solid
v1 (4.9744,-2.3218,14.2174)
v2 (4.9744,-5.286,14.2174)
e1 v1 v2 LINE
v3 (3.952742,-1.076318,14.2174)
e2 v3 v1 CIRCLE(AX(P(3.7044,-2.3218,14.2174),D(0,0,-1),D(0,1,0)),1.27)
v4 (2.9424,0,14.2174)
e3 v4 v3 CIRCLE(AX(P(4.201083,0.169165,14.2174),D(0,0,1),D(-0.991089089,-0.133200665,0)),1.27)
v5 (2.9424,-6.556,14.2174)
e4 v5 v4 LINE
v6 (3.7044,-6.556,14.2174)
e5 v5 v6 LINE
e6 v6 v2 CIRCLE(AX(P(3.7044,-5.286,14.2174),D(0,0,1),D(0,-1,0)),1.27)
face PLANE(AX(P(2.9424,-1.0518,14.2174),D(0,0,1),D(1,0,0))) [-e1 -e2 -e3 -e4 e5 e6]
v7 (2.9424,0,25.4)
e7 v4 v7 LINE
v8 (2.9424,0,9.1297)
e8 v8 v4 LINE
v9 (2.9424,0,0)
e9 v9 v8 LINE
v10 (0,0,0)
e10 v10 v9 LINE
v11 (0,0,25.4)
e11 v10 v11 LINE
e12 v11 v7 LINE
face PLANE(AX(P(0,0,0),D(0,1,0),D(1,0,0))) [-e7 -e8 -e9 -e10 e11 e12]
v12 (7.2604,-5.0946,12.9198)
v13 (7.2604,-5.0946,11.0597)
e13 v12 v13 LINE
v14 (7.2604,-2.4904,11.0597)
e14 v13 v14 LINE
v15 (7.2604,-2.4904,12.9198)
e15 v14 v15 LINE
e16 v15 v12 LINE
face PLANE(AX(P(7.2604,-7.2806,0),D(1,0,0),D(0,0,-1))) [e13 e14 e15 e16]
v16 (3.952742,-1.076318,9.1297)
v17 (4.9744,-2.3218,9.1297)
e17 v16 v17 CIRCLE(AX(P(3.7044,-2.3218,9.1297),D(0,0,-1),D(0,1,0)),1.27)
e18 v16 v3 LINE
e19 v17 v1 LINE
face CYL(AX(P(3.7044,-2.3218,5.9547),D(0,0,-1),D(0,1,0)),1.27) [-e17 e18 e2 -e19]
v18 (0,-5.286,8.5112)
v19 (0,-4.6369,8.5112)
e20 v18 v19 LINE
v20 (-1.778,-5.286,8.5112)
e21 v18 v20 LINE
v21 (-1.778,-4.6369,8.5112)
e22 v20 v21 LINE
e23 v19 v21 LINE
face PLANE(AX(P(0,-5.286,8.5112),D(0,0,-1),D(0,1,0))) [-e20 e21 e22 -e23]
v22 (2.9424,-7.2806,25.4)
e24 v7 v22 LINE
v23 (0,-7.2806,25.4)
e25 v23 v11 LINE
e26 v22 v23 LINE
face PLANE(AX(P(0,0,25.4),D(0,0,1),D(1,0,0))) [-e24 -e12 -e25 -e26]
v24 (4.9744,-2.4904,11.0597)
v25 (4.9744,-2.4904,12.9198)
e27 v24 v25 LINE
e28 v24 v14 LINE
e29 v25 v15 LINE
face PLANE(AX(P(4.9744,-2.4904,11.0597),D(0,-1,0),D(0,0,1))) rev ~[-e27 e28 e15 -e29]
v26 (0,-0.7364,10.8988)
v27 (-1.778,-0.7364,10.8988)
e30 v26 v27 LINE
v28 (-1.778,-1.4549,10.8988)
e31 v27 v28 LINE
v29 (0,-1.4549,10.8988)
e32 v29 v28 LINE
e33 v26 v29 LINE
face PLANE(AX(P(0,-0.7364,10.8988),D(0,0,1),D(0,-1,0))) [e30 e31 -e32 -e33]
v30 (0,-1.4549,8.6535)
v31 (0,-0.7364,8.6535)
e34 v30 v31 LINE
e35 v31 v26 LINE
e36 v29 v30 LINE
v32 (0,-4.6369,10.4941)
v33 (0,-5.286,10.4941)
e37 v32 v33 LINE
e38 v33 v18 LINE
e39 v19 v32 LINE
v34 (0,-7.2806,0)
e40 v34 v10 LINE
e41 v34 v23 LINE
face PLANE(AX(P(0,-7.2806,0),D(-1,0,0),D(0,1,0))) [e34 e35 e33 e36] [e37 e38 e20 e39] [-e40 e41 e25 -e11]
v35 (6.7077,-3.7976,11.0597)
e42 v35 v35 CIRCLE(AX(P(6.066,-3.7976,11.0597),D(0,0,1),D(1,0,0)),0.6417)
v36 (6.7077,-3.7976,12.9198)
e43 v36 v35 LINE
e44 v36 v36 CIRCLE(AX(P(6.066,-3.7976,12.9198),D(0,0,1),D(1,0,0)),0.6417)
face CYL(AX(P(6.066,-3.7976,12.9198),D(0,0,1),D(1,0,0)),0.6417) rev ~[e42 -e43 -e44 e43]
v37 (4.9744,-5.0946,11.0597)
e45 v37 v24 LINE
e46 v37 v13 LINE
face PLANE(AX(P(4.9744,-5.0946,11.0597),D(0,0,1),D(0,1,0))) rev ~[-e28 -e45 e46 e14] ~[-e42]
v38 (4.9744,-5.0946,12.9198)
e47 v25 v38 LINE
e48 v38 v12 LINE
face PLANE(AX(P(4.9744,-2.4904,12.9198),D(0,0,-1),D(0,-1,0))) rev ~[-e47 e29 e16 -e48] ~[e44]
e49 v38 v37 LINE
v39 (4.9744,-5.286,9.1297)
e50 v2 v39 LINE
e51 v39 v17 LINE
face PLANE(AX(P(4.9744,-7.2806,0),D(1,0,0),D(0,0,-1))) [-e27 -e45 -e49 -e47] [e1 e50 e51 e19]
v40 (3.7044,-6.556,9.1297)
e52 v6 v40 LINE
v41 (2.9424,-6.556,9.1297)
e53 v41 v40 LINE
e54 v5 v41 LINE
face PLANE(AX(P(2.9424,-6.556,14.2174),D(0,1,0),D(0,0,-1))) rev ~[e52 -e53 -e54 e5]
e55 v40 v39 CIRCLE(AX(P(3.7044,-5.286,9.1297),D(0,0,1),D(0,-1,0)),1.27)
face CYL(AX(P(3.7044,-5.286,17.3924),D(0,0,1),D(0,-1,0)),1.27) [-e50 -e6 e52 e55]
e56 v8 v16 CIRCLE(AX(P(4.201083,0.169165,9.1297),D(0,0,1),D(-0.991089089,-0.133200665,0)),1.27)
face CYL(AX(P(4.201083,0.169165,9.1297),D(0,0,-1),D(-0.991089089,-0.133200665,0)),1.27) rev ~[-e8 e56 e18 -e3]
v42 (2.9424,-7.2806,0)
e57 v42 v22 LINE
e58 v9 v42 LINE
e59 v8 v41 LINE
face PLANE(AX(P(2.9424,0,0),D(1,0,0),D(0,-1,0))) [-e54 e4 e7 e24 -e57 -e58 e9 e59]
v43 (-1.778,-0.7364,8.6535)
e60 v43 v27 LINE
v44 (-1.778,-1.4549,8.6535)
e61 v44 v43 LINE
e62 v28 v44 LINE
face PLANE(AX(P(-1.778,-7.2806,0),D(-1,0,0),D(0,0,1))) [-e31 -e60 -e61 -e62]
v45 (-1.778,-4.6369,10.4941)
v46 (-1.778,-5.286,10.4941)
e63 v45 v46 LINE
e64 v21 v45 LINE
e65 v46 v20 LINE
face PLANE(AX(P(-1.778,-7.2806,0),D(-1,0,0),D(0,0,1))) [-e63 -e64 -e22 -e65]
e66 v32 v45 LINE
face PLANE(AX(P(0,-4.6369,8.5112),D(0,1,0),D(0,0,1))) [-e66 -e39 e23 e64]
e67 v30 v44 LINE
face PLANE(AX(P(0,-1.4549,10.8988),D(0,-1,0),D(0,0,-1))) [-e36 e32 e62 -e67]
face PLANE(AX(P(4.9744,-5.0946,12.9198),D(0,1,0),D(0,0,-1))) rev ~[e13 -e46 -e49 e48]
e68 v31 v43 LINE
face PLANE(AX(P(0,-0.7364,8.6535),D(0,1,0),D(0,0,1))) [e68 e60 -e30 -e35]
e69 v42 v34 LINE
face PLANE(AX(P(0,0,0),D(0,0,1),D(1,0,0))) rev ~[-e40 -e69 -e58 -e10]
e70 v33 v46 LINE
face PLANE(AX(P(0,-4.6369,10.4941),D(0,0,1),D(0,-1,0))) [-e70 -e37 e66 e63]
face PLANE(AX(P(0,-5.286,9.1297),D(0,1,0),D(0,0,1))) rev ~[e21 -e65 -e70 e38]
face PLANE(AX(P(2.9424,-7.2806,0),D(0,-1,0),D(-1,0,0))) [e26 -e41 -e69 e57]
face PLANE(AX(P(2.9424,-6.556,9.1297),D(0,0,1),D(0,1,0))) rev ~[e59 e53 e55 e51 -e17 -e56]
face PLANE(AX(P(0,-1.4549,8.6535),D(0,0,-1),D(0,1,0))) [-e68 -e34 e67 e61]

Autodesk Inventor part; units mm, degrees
ref_plane "YZ Plane" through (0, 0, 0) normal (1, 0, 0) x (0, 1, 0)
ref_plane "XZ Plane" through (0, 0, 0) normal (0, 1, 0) x (-1, 0, 0)
ref_plane "XY Plane" through (0, 0, 0) normal (0, 0, 1) x (1, 0, 0)
sketch "Sketch1" plane through (0, 0, 0) normal (0, 0, 1) x (1, 0, 0)
  line L0 (0, 0) -> (2.9424, 0)
  line L1 (2.9424, 0) -> (2.9424, -7.2806)
  line L2 (2.9424, -7.2806) -> (0, -7.2806)
  line L3 (0, -7.2806) -> (0, 0)
extrude "Extrusion1" add sketch "Sketch1" along normal blind 25.4
sketch "Sketch2" plane through (2.9424, -7.2806, 0) normal (1, 0, 0) x (0, 0, -1)
  point P0 (0, 7.2806)
sketch "Sketch3" plane through (2.9424, -7.2806, 0) normal (1, 0, 0) x (0, 0, -1)
  line L0 (-9.1297, 6.2288) -> (-14.2174, 6.2288)
  line L1 (-14.2174, 6.2288) -> (-14.2174, 0.7246)
  line L2 (-14.2174, 0.7246) -> (-9.1297, 0.7246)
  line L3 (-9.1297, 0.7246) -> (-9.1297, 6.2288)
  point P0 (0, 7.2806)
extrude "Extrusion2" add sketch "Sketch3" along normal blind 2.032
fillet "Fillet1" radius 1.27 3 edges at (4.9744, -1.0519, 11.6735) (4.9744, -6.556, 11.6735) (2.9424, -1.0519, 11.6735)
sketch "Sketch4" plane through (4.9744, -7.2806, 0) normal (1, 0, 0) x (0, 0, -1)
  line L0 (-12.9198, 2.186) -> (-11.0597, 2.186)
  line L1 (-11.0597, 2.186) -> (-11.0597, 4.7902)
  line L2 (-11.0597, 4.7902) -> (-12.9198, 4.7902)
  line L3 (-12.9198, 4.7902) -> (-12.9198, 2.186)
  point P0 (0, 7.2806)
extrude "Extrusion3" add sketch "Sketch4" along normal blind 2.286
sketch "Sketch5" plane through (4.9744, -7.2806, 0) normal (1, 0, 0) x (0, 0, -1)
  point P0 (0, 7.2806)
sketch "Sketch6" plane through (7.2604, -3.8837, 11.7408) normal (1, 0, 0) x (0, 0, -1)
  point P0 (11.7408, 3.8837)
sketch "Sketch7" plane through (4.9744, -5.0946, 12.9198) normal (0, 0, 1) x (1, 0, 0)
  circle A0 centre (1.0916, 1.297) radius 0.6417
  point P0 (-4.9744, 5.0946)
extrude "Extrusion4" cut sketch "Sketch7" against normal blind 25.4
sketch "Sketch8" plane through (0, -7.2806, 0) normal (0, -1, 0) x (1, 0, 0)
  point P0 (0, 0)
sketch "Sketch9" plane through (0, -7.2806, 0) normal (-1, 0, 0) x (0, 0, 1)
  line L0 (8.6535, 6.5442) -> (10.8988, 6.5442)
  line L1 (10.8988, 6.5442) -> (10.8988, 5.8257)
  line L2 (10.8988, 5.8257) -> (8.6535, 5.8257)
  line L3 (8.6535, 5.8257) -> (8.6535, 6.5442)
  point P0 (0, 7.2806)
extrude "Extrusion5" add sketch "Sketch9" along normal blind 1.778
sketch "Sketch10" plane through (0, -7.2806, 0) normal (-1, 0, 0) x (0, 0, 1)
  line L0 (9.1297, 1.9946) -> (14.2174, 1.9946) projected
  line L1 (8.5112, 2.6437) -> (10.4941, 2.6437)
  line L2 (10.4941, 2.6437) -> (10.4941, 1.9946)
  line L3 (10.4941, 1.9946) -> (8.5112, 1.9946)
  line L4 (8.5112, 1.9946) -> (8.5112, 2.6437)
  point P0 (0, 7.2806)
extrude "Extrusion6" add sketch "Sketch10" along normal blind 1.778
properties part number "pen holder" material "Wood (Oak)"
